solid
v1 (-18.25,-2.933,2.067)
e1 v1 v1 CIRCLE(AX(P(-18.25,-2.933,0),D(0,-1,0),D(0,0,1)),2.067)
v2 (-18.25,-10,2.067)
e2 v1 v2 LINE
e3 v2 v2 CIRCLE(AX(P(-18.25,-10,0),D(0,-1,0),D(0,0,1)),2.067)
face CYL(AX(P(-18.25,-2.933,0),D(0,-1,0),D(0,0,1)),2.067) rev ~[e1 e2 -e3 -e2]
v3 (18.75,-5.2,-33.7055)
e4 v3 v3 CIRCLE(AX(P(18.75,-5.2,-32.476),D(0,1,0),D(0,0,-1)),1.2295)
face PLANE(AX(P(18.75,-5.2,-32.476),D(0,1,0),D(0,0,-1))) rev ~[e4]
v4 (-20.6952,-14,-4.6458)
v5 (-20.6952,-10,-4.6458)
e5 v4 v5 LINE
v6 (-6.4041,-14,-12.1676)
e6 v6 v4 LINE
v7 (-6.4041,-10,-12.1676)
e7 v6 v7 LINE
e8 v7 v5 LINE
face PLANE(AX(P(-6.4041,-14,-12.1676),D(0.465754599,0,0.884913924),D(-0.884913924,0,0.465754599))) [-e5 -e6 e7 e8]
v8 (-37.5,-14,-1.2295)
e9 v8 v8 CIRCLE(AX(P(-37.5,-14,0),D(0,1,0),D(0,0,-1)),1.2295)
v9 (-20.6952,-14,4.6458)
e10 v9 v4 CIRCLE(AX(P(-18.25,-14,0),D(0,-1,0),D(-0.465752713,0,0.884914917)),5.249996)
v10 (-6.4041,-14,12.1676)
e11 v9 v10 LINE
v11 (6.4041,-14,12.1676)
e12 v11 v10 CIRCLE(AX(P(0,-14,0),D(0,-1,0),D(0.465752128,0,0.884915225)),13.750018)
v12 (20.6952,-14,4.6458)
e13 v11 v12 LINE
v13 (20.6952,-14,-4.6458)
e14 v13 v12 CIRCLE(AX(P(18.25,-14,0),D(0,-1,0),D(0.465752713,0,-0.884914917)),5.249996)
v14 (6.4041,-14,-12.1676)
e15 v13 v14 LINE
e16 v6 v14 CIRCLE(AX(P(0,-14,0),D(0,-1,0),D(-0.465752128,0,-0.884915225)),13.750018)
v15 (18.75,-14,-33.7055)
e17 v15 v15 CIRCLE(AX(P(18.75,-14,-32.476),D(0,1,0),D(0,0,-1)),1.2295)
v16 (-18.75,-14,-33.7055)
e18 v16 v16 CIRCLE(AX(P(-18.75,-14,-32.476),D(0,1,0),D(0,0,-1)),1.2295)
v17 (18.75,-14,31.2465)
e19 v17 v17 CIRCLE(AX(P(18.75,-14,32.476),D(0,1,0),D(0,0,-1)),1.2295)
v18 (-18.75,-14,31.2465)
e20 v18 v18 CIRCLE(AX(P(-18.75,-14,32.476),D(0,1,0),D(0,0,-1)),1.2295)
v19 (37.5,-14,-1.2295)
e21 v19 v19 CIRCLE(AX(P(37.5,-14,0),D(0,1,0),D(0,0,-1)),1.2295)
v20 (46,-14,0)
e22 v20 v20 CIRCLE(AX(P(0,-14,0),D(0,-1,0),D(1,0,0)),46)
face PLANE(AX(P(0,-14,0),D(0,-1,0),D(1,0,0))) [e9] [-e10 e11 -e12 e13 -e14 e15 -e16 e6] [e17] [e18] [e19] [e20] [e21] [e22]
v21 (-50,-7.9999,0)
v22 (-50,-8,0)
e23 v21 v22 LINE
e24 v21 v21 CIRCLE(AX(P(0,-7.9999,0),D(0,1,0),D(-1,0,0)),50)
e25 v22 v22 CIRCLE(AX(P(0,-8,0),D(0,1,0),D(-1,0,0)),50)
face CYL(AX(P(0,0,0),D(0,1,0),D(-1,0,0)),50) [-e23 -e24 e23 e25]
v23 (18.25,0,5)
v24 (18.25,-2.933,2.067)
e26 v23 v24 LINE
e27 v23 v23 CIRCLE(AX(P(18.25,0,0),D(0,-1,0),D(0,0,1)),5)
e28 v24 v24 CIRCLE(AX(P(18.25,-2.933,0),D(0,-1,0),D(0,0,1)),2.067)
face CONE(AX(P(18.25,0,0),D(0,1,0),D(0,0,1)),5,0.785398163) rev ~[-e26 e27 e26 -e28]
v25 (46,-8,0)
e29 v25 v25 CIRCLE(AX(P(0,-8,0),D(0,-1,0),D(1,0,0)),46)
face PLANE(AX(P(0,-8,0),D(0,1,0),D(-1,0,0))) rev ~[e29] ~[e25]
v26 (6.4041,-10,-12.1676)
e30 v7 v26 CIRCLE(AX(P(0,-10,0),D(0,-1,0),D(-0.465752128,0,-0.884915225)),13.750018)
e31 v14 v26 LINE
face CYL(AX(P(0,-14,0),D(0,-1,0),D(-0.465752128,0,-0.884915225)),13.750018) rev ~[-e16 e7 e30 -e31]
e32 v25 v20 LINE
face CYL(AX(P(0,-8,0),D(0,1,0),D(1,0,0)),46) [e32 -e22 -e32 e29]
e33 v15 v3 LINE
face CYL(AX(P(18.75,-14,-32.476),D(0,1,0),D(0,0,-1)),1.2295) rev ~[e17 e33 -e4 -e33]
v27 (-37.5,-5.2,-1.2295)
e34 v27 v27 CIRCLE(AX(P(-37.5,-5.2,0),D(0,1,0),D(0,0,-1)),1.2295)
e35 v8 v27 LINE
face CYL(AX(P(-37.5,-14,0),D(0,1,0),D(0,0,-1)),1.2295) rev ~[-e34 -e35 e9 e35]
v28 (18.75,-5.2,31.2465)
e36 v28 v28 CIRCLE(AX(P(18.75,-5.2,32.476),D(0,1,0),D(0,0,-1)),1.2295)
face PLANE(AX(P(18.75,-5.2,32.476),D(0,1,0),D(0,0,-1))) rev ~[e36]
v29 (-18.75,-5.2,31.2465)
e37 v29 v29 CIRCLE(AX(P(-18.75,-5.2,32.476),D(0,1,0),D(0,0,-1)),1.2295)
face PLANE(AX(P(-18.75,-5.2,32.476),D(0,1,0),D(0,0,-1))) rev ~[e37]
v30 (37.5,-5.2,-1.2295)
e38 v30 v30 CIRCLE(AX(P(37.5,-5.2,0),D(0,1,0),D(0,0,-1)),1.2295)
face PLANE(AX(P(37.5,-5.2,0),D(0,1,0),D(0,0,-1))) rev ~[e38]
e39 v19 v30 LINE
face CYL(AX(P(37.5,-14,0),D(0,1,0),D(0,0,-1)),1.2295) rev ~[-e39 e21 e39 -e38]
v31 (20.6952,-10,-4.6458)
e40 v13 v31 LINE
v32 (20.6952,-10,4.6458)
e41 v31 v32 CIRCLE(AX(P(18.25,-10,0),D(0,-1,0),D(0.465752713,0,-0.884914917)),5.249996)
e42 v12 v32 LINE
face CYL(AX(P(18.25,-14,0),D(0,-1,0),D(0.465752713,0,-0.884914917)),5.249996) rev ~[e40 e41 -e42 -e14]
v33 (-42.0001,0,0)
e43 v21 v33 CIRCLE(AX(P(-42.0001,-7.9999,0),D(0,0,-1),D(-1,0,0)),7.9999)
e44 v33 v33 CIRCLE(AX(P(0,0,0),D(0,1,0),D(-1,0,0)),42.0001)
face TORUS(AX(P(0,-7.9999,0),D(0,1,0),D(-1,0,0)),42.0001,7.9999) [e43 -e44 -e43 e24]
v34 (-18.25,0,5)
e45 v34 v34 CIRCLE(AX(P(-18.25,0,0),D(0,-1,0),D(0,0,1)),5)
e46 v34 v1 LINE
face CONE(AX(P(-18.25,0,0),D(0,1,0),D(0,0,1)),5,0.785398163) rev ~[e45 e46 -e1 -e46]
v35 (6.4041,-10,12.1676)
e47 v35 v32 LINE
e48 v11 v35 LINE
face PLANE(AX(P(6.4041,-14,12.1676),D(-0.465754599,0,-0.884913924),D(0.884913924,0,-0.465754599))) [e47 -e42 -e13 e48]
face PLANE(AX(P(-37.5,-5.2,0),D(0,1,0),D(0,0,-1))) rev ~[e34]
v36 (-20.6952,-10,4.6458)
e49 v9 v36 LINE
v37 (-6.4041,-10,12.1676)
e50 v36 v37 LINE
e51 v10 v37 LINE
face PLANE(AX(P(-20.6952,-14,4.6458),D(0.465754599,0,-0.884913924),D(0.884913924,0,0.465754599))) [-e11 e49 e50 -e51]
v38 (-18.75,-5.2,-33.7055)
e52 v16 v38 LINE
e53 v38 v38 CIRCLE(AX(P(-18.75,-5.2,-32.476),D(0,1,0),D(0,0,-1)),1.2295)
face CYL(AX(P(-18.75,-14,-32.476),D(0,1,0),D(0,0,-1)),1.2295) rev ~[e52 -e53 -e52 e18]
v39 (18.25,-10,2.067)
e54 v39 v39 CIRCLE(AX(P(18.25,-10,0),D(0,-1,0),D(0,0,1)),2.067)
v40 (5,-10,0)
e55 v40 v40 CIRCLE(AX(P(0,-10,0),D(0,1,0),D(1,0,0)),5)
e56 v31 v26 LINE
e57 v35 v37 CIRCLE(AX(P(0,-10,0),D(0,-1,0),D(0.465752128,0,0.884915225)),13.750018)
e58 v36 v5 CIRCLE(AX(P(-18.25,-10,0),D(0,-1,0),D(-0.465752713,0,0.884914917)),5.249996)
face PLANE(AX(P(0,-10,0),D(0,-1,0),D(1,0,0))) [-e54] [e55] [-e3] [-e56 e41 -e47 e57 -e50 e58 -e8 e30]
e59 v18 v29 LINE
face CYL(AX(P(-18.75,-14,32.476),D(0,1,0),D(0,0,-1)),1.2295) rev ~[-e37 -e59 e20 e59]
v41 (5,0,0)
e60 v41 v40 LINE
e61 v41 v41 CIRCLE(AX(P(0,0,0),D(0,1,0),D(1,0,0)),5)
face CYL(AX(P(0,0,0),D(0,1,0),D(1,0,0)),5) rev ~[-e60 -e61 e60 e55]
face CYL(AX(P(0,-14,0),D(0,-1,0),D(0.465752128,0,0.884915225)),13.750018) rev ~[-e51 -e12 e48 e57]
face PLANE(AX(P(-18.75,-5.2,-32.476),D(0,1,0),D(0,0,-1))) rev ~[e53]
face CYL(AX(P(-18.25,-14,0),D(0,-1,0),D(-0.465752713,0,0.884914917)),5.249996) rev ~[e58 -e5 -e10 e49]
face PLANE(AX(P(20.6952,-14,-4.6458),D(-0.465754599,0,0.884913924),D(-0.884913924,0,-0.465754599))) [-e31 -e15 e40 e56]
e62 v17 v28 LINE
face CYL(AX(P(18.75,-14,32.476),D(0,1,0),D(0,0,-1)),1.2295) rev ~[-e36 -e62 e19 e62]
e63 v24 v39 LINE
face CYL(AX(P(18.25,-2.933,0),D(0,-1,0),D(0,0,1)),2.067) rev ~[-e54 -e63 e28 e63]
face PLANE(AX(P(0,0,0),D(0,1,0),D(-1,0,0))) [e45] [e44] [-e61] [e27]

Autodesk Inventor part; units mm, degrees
ref_plane "YZ Plane" through (0, 0, 0) normal (1, 0, 0) x (0, 1, 0)
ref_plane "XZ Plane" through (0, 0, 0) normal (0, 1, 0) x (-1, 0, 0)
ref_plane "XY Plane" through (0, 0, 0) normal (0, 0, 1) x (1, 0, 0)
sketch "Boceto1" plane through (0, 0, 0) normal (0, 1, 0) x (-1, 0, 0)
  circle A0 centre (0, 0) radius 50
  dimension "Diametro" = 100
extrude "Extrusión1" add sketch "Boceto1" against normal blind 8
fillet "Empalme1" radius 8 1 edges at (50, 0, 0)
sketch "Boceto2" plane through (0, -8, 0) normal (0, -1, 0) x (1, 0, 0)
  circle A0 centre (0, 0) radius 46
  circle A1 centre (0, 0) radius 50 projected
  dimension "d22" = 4
extrude "Extrusión3" add sketch "Boceto2" along normal blind 6 contours A0
sketch "Boceto3" plane through (0, -14, 0) normal (0, -1, 0) x (1, 0, 0)
  point P0 (0, 0)
  point P1 (-37.5, 0)
  point P2 (-18.75, -32.476)
  point P3 (18.75, -32.476)
  point P4 (37.5, 0)
  point P5 (18.75, 32.476)
  point P6 (-18.75, 32.476)
  dimension "d25" = 37.5
  dimension "d35" = 360
hole "Agujero2" at (-37.5, -14, 0) at (-18.75, -14, 32.476) at (-18.75, -14, -32.476) at (18.75, -14, 32.476) at (37.5, -14, 0) at (18.75, -14, -32.476) direction (0, 1, 0) diameter 2.459 depth 8.8 thread size "M3x0.5" class "6H" standard "ANSI Metric M Profile"
sketch "Boceto4" plane through (0, -14, 0) normal (0, -1, 0) x (1, 0, 0)
  arc A0 (20.5788, -4.4246) -> (20.5788, 4.4246) centre (18.25, 0) ccw
  line L0 (20.5788, 4.4246) -> (6.2877, 11.9463)
  arc A1 (6.2877, 11.9463) -> (-6.2877, 11.9463) centre (0, 0) ccw
  line L1 (-6.2877, 11.9463) -> (-20.5788, 4.4246)
  arc A2 (-20.5788, 4.4246) -> (-20.5788, -4.4246) centre (-18.25, 0) ccw
  line L2 (-20.5788, -4.4246) -> (-6.2877, -11.9463)
  arc A3 (-6.2877, -11.9463) -> (6.2877, -11.9463) centre (0, 0) ccw
  line L3 (6.2877, -11.9463) -> (20.5788, -4.4246)
  line L4 (-17.0094, 4.3256) -> (-5.4726, 10.3977)
  arc A4 (5.4726, 10.3977) -> (-5.4726, 10.3977) centre (0, 0) ccw
  line L5 (5.4726, 10.3977) -> (17.0094, 4.3256)
  arc A5 (17.0094, 4.3256) -> (17.0094, -4.3256) centre (18.25, 0) ccw
  line L6 (17.0094, -4.3256) -> (5.4726, -10.3977)
  arc A6 (-5.4726, -10.3977) -> (5.4726, -10.3977) centre (0, 0) ccw
  line L7 (-5.4726, -10.3977) -> (-17.0094, -4.3256)
  arc A7 (-17.0094, -4.3256) -> (-17.0094, 4.3256) centre (-18.25, 0) ccw
  circle A8 centre (18.25, 0) radius 2.5
  circle A9 centre (-18.25, 0) radius 2.5
  point P0 (0, 0)
  point P1 (20.5788, 4.4246)
  point P2 (-6.2877, 11.9463)
  point P3 (-20.5788, -4.4246)
  point P4 (6.2877, -11.9463)
  dimension "d3" = 8
extrude "Extrusión5" cut sketch "Boceto4" against normal blind 4 contours L3 A3 L2 A2 L1 A1 L0 A0 | L4 A4 L5 A5 L6 A6 L7 A7 | A8 | A9
sketch "Boceto5" plane through (0, -14, 0) normal (0, -1, 0) x (1, 0, 0)
  line L0 (6.2877, 11.9463) -> (20.5788, 4.4246) projected
  arc A0 (6.2877, 11.9463) -> (-6.2877, 11.9463) centre (0, 0) ccw projected
  line L1 (-20.5788, 4.4246) -> (-6.2877, 11.9463) projected
  arc A1 (-20.5788, 4.4246) -> (-20.5788, -4.4246) centre (-18.25, 0) ccw projected
  line L2 (-6.2877, -11.9463) -> (-20.5788, -4.4246) projected
  arc A2 (-6.2877, -11.9463) -> (6.2877, -11.9463) centre (0, 0) ccw projected
  line L3 (20.5788, -4.4246) -> (6.2877, -11.9463) projected
  arc A3 (20.5788, -4.4246) -> (20.5788, 4.4246) centre (18.25, 0) ccw projected
  arc A4 (6.4041, 12.1676) -> (-6.4041, 12.1676) centre (0, 0) ccw
  line L4 (6.4041, 12.1676) -> (20.6952, 4.6458)
  arc A5 (20.6952, -4.6458) -> (20.6952, 4.6458) centre (18.25, 0) ccw
  line L5 (20.6952, -4.6458) -> (6.4041, -12.1676)
  arc A6 (-6.4041, -12.1676) -> (6.4041, -12.1676) centre (0, 0) ccw
  line L6 (-6.4041, -12.1676) -> (-20.6952, -4.6458)
  arc A7 (-20.6952, 4.6458) -> (-20.6952, -4.6458) centre (-18.25, 0) ccw
  line L7 (-20.6952, 4.6458) -> (-6.4041, 12.1676)
  point P0 (0, 0)
  dimension "d44" = 0.25
extrude "Extrusión7" cut sketch "Boceto5" against normal up to surface (4 mm away) contours L0 A3 L3 A2 L2 A1 L1 A0 | L4 A5 L5 A6 L6 A7 L7 A4
sketch "Boceto6" plane through (0, 0, 0) normal (0, 1, 0) x (1, 0, 0)
  point P0 (0, 0)
  point P1 (-18.25, 0)
  point P2 (18.25, 0)
hole "Agujero3" at (-18.25, 0, 0) at (18.25, 0, 0) direction (0, -1, 0) diameter 4.134 end through all countersink diameter 10 countersink angle 90 thread size "M5x0.8" class "6H" standard "ISO Metric profile"
sketch "Boceto7" plane through (0, 0, 0) normal (0, 1, 0) x (1, 0, 0)
  circle A0 centre (0, 0) radius 5
  dimension "d54" = 10
extrude "Extrusión8" cut sketch "Boceto7" against normal through all
sketch "Boceto9" plane through (0, 0, 0) normal (0, 1, 0) x (1, 0, 0)
  circle A0 centre (0, 0) radius 8.0135
  circle A1 centre (0, 0) radius 5
  dimension "d57" = 16.027
  dimension "d58" = 10
extrude "Extrusión9" [suppressed]
extrude "Extrusión10" [suppressed]
properties part number "Tapa" material "Aluminum 7075"
